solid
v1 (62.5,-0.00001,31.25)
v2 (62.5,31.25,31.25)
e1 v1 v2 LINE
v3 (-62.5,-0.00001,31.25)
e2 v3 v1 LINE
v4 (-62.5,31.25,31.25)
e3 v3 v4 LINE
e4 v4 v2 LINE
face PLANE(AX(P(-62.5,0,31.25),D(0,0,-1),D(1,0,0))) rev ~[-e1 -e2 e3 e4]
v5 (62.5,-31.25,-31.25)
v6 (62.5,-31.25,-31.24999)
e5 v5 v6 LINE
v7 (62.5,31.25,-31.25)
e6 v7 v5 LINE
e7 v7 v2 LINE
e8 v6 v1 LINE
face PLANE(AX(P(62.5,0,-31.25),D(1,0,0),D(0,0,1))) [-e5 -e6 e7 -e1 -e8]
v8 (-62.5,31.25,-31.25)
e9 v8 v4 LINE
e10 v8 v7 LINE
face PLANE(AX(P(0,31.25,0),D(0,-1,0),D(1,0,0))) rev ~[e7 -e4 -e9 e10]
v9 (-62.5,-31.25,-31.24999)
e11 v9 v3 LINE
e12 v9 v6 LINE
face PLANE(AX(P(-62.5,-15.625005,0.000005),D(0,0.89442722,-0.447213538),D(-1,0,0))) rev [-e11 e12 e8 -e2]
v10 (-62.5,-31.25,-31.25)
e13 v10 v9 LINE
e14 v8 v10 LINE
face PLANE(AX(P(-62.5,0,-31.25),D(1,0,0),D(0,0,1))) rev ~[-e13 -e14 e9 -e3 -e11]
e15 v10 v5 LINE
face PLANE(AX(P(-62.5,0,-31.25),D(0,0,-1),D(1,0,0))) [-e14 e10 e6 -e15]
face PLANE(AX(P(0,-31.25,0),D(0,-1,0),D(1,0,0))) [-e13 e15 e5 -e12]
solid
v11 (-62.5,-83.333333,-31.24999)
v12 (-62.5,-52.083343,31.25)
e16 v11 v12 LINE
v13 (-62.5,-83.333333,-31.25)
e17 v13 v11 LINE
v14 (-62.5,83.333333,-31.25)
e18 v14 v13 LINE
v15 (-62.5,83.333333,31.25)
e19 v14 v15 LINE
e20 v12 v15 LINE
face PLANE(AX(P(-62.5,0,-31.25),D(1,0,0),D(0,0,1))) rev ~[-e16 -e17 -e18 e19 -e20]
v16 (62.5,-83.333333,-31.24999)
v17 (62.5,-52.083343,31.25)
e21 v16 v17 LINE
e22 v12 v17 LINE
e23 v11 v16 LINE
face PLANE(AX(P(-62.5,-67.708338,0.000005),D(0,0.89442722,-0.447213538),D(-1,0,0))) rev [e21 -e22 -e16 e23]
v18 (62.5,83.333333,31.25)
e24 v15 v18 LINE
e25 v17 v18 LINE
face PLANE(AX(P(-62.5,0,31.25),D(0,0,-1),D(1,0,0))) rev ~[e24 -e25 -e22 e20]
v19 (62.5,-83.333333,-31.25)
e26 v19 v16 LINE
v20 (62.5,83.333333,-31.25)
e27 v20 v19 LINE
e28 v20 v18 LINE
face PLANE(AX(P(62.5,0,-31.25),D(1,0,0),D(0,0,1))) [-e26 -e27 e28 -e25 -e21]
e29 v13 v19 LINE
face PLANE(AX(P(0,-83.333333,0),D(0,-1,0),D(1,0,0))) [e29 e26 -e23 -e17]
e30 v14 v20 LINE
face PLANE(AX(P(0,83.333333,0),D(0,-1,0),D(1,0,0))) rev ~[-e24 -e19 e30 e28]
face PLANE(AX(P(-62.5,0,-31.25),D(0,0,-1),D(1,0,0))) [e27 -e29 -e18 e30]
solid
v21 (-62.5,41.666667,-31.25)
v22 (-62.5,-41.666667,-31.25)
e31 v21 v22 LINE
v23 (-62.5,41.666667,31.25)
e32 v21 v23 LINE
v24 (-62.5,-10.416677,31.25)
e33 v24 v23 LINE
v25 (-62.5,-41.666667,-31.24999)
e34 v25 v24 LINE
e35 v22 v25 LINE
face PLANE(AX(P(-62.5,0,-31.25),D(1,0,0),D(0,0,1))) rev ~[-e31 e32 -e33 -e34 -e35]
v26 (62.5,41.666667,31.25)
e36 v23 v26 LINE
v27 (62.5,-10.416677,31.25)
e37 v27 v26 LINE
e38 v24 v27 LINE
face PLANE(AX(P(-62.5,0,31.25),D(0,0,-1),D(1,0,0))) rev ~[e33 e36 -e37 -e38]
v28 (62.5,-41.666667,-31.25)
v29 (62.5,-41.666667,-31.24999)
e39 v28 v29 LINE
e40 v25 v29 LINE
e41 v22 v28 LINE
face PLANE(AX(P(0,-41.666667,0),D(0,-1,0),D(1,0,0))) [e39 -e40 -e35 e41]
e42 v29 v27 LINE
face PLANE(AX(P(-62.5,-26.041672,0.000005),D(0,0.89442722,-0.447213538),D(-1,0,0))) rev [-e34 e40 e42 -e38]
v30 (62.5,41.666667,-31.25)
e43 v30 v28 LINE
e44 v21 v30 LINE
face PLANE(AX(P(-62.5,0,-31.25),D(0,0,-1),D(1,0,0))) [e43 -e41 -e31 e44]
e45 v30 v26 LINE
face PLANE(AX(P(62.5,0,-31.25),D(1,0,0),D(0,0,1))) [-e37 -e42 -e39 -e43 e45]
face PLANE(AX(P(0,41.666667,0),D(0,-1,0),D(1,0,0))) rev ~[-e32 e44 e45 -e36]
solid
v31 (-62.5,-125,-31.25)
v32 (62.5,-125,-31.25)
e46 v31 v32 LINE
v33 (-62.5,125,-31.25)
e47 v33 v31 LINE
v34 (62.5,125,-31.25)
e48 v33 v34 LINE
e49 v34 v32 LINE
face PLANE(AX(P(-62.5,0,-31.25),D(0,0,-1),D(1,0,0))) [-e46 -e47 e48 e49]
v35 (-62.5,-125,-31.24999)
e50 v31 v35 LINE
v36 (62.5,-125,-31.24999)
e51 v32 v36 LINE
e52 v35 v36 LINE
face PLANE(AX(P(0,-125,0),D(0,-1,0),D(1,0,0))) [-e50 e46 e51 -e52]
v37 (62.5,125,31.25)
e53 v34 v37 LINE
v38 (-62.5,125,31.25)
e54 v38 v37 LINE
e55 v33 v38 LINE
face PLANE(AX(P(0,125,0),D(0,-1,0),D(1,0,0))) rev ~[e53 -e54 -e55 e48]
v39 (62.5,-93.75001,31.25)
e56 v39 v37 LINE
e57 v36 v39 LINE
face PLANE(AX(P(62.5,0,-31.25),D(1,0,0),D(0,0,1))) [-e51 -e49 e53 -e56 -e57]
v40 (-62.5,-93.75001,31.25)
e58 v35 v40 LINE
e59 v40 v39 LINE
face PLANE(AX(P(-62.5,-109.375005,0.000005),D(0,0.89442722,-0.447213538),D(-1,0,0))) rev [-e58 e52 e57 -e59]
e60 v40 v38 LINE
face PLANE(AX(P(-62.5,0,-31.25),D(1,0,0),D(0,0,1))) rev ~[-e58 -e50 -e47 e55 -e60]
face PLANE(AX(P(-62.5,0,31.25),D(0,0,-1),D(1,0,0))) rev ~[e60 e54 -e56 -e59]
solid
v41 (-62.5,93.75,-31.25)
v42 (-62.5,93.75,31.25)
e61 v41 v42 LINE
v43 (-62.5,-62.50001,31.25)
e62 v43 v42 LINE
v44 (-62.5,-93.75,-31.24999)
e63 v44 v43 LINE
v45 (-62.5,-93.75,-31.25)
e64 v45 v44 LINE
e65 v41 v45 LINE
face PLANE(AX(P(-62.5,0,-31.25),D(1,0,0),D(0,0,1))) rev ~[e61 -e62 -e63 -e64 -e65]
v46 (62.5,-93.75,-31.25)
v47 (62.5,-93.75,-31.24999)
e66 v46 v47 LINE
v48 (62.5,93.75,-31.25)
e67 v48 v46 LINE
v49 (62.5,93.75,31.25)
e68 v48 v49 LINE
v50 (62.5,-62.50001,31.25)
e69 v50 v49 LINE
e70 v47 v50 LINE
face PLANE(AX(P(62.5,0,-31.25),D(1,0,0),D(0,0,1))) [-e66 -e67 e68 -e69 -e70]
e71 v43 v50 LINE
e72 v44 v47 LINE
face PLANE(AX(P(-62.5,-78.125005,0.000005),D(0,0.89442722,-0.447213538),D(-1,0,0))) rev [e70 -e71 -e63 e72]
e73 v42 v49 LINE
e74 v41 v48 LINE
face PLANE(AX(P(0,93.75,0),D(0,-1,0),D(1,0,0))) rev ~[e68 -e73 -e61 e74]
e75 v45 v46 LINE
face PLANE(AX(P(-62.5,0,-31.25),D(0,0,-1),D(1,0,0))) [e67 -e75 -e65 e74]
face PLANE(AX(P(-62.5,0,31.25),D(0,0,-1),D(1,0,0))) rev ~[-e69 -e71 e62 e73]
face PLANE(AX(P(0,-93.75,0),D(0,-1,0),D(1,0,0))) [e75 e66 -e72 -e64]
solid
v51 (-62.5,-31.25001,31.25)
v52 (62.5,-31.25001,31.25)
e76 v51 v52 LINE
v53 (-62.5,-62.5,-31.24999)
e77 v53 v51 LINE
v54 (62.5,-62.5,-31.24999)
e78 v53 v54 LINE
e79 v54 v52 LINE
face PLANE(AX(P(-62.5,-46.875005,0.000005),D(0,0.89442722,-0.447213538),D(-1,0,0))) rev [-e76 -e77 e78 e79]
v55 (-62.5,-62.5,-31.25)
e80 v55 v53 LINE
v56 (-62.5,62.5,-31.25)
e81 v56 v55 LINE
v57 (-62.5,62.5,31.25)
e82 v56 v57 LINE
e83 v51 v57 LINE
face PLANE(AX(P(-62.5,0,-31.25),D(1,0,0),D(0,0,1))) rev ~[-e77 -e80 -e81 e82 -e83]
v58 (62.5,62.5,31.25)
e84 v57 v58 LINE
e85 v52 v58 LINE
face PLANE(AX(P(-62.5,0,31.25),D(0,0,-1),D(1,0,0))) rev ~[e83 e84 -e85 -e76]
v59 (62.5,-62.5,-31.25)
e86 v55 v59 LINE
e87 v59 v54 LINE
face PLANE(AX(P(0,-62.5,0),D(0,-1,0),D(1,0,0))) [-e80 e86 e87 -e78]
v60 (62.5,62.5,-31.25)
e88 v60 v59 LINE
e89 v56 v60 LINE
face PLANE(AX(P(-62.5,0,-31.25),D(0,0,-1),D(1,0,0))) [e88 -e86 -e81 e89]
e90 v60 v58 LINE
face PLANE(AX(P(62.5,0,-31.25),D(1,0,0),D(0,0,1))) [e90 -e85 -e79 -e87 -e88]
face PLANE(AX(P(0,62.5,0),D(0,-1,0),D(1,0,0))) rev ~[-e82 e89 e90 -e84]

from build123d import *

# Parameters (mm, degrees)
F0_W      = 125
F0_H      = 62.5
F1_DEPTH  = 125
F2_DEPTH  = 62.5
F3_DEPTH  = 93.75
F4_DEPTH  = 31.25
F5_DEPTH  = 83.3333333333
F6_DEPTH  = 41.6666666667
F7_SIZE2  = 31.24999
F7_SIZE   = 62.49999
F8_SIZE2  = 31.24999
F8_SIZE   = 62.49999
F9_SIZE2  = 31.24999
F9_SIZE   = 62.49999
F10_SIZE2 = 31.24999
F10_SIZE  = 62.49999
F11_SIZE2 = 31.24999
F11_SIZE  = 62.49999
F12_SIZE2 = 31.24999
F12_SIZE  = 62.49999


# Not quite as in the source:
# - a fillet or chamfer is up to 0.001 mm smaller than in the source, because OpenCascade refuses the exact size


with BuildPart() as f1:
    # F0 (on Front) → F1 (new body, symmetric)
    with BuildSketch(Plane.XZ):
        Rectangle(F0_W, F0_H)
    extrude(amount=F1_DEPTH, both=True)

    # F7 (size 62.5 and 31.25 in the source; OpenCascade refuses exactly that, so slightly less here)
    f7_edges = [f1.edges().sort_by_distance(p)[0] for p in [
        (0, -125, 31.25),
    ]]
    f7_side = f1.faces().sort_by_distance((0, -125, 0))[0]
    chamfer(f7_edges, length=F7_SIZE, length2=F7_SIZE2, reference=f7_side)


with BuildPart() as f2:
    # F0 (on Front) → F2 (new body, symmetric)
    with BuildSketch(Plane.XZ):
        Rectangle(F0_W, F0_H)
    extrude(amount=F2_DEPTH, both=True)

    # F8 (size 62.5 and 31.25 in the source; OpenCascade refuses exactly that, so slightly less here)
    f8_edges = [f2.edges().sort_by_distance(p)[0] for p in [
        (0, -62.5, 31.25),
    ]]
    f8_side = f2.faces().sort_by_distance((0, -62.5, 0))[0]
    chamfer(f8_edges, length=F8_SIZE, length2=F8_SIZE2, reference=f8_side)


with BuildPart() as f3:
    # F0 (on Front) → F3 (new body, symmetric)
    with BuildSketch(Plane.XZ):
        Rectangle(F0_W, F0_H)
    extrude(amount=F3_DEPTH, both=True)

    # F9 (size 62.5 and 31.25 in the source; OpenCascade refuses exactly that, so slightly less here)
    f9_edges = [f3.edges().sort_by_distance(p)[0] for p in [
        (0, -93.75, 31.25),
    ]]
    f9_side = f3.faces().sort_by_distance((0, -93.75, 0))[0]
    chamfer(f9_edges, length=F9_SIZE, length2=F9_SIZE2, reference=f9_side)


with BuildPart() as f4:
    # F0 (on Front) → F4 (new body, symmetric)
    with BuildSketch(Plane.XZ):
        Rectangle(F0_W, F0_H)
    extrude(amount=F4_DEPTH, both=True)

    # F11 (size 62.5 and 31.25 in the source; OpenCascade refuses exactly that, so slightly less here)
    f11_edges = [f4.edges().sort_by_distance(p)[0] for p in [
        (0, -31.25, 31.25),
    ]]
    f11_side = f4.faces().sort_by_distance((0, -31.25, 0))[0]
    chamfer(f11_edges, length=F11_SIZE, length2=F11_SIZE2, reference=f11_side)


with BuildPart() as f5:
    # F0 (on Front) → F5 (new body, symmetric)
    with BuildSketch(Plane.XZ):
        Rectangle(F0_W, F0_H)
    extrude(amount=F5_DEPTH, both=True)

    # F10 (size 62.5 and 31.25 in the source; OpenCascade refuses exactly that, so slightly less here)
    f10_edges = [f5.edges().sort_by_distance(p)[0] for p in [
        (0, -83.333333, 31.25),
    ]]
    f10_side = f5.faces().sort_by_distance((0, -83.333333, 0))[0]
    chamfer(f10_edges, length=F10_SIZE, length2=F10_SIZE2, reference=f10_side)


with BuildPart() as f6:
    # F0 (on Front) → F6 (new body, symmetric)
    with BuildSketch(Plane.XZ):
        Rectangle(F0_W, F0_H)
    extrude(amount=F6_DEPTH, both=True)

    # F12 (size 62.5 and 31.25 in the source; OpenCascade refuses exactly that, so slightly less here)
    f12_edges = [f6.edges().sort_by_distance(p)[0] for p in [
        (0, -41.666667, 31.25),
    ]]
    f12_side = f6.faces().sort_by_distance((0, -41.666667, 0))[0]
    chamfer(f12_edges, length=F12_SIZE, length2=F12_SIZE2, reference=f12_side)


solid = Compound([f1.part, f2.part, f3.part, f4.part, f5.part, f6.part])
